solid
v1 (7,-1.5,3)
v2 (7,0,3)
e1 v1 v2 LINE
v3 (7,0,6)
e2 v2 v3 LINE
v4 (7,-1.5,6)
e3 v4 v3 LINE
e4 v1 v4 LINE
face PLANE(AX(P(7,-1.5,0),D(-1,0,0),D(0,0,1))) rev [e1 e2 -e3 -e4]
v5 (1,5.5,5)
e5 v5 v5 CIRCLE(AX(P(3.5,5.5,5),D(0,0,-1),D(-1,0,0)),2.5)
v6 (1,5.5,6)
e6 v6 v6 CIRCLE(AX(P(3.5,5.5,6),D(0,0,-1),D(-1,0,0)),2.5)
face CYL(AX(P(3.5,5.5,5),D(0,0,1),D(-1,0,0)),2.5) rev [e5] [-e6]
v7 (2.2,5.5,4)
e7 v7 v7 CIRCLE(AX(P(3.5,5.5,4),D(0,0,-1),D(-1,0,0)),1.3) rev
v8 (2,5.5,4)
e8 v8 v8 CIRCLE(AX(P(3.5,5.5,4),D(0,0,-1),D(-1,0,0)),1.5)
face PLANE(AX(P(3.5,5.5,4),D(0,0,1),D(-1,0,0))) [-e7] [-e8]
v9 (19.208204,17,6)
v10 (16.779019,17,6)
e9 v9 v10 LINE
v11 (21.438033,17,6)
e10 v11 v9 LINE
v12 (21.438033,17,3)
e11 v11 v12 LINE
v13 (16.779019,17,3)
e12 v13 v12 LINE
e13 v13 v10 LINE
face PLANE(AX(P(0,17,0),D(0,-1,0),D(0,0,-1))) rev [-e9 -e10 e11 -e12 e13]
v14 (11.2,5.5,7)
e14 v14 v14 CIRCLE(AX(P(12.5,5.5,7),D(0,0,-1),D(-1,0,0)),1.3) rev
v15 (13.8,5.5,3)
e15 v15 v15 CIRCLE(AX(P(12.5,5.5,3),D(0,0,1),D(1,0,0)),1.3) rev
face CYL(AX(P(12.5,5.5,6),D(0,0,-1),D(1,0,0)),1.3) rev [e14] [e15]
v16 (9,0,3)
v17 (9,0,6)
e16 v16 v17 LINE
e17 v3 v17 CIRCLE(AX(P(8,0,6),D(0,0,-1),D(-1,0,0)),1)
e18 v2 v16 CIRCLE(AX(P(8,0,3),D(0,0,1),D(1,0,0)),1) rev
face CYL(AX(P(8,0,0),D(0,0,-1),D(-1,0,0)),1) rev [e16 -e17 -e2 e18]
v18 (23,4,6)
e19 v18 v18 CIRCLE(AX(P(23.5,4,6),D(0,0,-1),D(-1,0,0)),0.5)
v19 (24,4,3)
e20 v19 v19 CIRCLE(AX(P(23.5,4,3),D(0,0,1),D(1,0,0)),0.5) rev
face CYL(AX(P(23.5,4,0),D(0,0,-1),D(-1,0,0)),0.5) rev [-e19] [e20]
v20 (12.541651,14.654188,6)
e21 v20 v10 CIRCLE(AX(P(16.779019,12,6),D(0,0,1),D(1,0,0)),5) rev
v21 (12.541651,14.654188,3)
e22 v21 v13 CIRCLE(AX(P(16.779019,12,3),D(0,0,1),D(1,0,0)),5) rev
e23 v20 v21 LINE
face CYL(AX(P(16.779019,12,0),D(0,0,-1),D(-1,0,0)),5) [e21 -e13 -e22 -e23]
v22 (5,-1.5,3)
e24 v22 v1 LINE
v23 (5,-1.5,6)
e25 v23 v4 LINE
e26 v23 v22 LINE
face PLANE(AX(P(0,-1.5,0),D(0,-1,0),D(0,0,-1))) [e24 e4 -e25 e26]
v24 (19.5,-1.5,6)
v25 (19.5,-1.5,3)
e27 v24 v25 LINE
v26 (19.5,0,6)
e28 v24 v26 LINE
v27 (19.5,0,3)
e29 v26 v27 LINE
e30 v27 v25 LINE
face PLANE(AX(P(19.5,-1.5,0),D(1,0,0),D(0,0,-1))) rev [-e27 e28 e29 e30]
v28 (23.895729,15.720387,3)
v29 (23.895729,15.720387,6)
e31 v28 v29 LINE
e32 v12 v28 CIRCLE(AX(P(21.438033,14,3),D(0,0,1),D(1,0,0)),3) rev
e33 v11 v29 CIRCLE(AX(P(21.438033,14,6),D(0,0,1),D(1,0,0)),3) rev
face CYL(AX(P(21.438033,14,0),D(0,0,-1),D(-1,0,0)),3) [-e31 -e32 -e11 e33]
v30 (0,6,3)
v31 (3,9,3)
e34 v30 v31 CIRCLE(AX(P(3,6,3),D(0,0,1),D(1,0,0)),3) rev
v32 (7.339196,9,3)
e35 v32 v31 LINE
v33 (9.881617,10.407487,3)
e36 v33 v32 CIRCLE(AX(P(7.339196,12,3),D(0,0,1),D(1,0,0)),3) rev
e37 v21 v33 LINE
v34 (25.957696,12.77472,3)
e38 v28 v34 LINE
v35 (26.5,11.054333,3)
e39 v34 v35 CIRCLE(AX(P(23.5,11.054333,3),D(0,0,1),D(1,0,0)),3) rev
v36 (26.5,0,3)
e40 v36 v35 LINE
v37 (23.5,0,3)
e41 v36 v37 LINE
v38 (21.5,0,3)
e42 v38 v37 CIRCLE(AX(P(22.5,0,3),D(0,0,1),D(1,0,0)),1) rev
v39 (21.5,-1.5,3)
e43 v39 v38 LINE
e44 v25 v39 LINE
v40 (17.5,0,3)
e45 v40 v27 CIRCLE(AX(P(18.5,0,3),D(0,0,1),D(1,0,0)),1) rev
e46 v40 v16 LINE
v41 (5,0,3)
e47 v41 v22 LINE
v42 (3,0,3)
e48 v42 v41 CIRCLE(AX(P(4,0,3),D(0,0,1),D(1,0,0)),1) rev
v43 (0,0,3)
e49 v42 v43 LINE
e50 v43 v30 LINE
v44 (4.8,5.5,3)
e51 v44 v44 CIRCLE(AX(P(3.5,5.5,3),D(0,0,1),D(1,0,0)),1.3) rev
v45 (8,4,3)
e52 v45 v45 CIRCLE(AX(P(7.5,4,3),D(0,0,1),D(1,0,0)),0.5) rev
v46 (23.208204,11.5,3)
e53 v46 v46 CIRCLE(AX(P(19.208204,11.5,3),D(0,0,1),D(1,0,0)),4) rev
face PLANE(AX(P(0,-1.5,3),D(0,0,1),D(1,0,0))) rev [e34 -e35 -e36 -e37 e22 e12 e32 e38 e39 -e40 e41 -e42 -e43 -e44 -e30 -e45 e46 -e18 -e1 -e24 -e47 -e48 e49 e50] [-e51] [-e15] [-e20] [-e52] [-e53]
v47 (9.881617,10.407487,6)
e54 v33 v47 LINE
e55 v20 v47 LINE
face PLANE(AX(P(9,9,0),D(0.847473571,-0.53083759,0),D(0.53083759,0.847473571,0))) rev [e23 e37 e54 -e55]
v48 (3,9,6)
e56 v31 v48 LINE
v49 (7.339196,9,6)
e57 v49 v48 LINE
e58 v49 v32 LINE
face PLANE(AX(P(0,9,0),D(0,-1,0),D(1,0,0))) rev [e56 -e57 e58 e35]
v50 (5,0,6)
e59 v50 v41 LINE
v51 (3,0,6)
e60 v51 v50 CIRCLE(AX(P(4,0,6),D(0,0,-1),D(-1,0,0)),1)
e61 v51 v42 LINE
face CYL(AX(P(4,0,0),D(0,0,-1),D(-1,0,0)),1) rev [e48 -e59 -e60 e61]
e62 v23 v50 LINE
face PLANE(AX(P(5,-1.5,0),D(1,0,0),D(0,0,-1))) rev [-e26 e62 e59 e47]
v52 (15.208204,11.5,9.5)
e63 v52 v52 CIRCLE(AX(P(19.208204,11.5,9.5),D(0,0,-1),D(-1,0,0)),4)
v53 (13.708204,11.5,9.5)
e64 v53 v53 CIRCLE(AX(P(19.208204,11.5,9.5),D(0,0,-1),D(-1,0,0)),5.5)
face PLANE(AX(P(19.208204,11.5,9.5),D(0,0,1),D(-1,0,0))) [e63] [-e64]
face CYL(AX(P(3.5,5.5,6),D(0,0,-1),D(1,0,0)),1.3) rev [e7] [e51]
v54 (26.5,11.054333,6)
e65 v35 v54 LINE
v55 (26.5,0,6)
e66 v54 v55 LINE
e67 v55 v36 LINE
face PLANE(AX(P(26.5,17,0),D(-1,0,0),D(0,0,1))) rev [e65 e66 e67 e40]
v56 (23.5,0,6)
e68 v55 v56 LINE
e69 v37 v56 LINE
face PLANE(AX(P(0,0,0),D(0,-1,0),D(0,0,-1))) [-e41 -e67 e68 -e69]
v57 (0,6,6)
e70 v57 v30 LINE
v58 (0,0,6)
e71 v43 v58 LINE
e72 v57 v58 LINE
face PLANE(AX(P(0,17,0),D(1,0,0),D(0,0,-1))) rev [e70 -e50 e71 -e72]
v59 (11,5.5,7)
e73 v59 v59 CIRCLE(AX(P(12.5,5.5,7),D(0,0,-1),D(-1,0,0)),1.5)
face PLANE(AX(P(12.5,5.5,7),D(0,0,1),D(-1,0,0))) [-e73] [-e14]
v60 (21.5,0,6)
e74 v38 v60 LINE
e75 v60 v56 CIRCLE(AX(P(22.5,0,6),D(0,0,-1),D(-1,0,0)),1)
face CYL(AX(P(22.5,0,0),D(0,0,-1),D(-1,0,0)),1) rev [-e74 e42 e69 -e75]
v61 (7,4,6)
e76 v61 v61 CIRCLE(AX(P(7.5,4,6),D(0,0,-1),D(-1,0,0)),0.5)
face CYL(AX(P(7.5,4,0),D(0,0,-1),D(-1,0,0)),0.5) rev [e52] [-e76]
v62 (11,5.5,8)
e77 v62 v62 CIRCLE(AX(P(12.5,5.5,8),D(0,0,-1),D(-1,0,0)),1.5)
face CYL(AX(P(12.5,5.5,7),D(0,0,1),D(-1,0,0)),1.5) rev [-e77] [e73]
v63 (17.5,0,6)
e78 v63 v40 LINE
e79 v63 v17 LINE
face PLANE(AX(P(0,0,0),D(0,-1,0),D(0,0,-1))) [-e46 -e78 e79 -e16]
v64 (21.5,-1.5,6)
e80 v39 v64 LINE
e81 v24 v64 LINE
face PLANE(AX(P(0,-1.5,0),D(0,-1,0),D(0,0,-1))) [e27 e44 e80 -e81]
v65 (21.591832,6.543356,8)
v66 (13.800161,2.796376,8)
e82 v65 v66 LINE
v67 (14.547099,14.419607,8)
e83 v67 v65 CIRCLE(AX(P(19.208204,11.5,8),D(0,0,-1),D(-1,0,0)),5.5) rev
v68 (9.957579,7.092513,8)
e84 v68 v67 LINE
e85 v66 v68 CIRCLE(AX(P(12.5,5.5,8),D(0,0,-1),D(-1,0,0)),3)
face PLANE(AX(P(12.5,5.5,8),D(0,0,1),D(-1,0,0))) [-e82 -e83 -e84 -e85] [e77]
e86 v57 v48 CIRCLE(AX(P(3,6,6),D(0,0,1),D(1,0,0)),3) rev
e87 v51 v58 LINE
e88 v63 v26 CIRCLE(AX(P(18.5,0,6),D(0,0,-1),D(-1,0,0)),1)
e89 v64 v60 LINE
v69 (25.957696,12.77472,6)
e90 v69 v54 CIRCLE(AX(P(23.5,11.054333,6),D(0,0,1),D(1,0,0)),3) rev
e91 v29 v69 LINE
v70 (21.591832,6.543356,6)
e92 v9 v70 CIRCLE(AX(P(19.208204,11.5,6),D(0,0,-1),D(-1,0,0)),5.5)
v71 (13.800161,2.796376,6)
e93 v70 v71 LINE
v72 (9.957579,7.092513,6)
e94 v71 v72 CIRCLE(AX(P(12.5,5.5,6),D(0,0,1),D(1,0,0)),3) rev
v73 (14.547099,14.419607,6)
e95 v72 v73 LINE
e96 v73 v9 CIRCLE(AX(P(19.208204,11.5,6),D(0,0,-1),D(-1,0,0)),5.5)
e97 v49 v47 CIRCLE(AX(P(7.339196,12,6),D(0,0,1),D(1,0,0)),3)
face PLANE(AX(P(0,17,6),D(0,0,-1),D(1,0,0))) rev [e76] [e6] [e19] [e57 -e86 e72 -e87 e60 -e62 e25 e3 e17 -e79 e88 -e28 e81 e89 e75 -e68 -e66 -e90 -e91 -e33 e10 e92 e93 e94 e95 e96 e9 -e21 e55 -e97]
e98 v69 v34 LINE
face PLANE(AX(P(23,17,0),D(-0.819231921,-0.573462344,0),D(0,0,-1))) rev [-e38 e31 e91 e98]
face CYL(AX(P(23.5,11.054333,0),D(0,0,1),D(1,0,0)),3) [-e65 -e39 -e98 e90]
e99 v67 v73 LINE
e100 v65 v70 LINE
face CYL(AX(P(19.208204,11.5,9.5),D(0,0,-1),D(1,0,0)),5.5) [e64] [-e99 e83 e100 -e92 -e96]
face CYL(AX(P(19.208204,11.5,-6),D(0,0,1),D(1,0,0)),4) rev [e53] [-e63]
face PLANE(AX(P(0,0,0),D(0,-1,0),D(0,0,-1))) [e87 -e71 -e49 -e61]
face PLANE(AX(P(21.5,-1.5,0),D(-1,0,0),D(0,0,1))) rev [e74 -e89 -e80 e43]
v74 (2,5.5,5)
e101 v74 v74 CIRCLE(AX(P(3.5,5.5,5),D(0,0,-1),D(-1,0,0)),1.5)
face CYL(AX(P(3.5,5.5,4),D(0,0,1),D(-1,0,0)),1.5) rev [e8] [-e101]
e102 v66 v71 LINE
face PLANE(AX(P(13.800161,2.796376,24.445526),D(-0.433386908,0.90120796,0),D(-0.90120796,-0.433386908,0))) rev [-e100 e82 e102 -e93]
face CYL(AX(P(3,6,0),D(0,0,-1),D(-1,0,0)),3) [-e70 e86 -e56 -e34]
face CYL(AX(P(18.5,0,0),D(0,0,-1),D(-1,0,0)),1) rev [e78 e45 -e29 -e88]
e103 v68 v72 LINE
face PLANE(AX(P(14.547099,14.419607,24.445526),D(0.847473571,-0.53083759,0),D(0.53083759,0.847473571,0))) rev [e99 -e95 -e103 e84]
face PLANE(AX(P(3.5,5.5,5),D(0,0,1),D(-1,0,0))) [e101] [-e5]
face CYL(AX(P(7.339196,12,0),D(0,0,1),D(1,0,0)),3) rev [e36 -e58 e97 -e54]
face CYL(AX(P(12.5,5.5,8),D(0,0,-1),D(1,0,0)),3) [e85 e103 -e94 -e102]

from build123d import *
from build123d.topology import SkipClean

# Parameters (mm, degrees)
SKETCH1_W                            = 26.5
SKETCH1_H                            = 6
BOSS_EXTRUDE1_DEPTH                  = 17
SKETCH2_R                            = 1.5
CUT_EXTRUDE1_DEPTH                   = 1
SKETCH3_R                            = 1.3
CUT_EXTRUDE2_DEPTH                   = 32.878676259
SKETCH4_R                            = 4
CUT_EXTRUDE3_DEPTH                   = 33.050741021
SKETCH5_R                            = 2.5
CUT_EXTRUDE4_DEPTH                   = 1.5
SKETCH6_R                            = 1.5
CUT_EXTRUDE8_DEPTH                   = 1
SKETCH7_R                            = 1.3
CUT_EXTRUDE9_DEPTH                   = 32.678068123
CUT_EXTRUDE10_START                  = -1
SKETCH8_R                            = 2.5
CUT_EXTRUDE10_DEPTH                  = 1
CUT_EXTRUDE11_START                  = -1
SKETCH9_R                            = 1.5
CUT_EXTRUDE11_DEPTH                  = 1
SKETCH10_R                           = 5.5
SKETCH10_R_2                         = 4
BOSS_EXTRUDE2_DEPTH                  = 3.5
SKETCH11_R                           = 3
SKETCH11_R_2                         = 1.3
BOSS_EXTRUDE4_DEPTH                  = 2
CUT_EXTRUDE12_START                  = -1
SKETCH12_R                           = 1.5
CUT_EXTRUDE12_DEPTH                  = 1
SKETCH17_W                           = 2
SKETCH17_H                           = 6
BOSS_EXTRUDE6_DEPTH                  = 1.5
SKETCH18_R                           = 1
CUT_EXTRUDE17_DEPTH                  = 33.050741021
CHAMFER2_SIZE                        = 5
CHAMFER2_SIZE2                       = 3.5
FILLET11_R                           = 3
BOSS_EXTRUDE7_DEPTH                  = 2
CUT_EXTRUDE19_DEPTH                  = 33.050741021
FILLET13_R                           = 5
FILLET14_R                           = 3
FILLET15_R                           = 3
SKIZZE1_R                            = 0.5
SCHNITT_LINEAR_AUSTRAGEN1_DEPTH      = 33.050741021
SPIEGELN1_OUTLINE_R                  = 4
SPIEGELN1_OUTLINE_R_2                = 2.5
SPIEGELN1_OUTLINE_R_3                = 0.5
SPIEGELN1_OUTLINE_R_4                = 1.5
SPIEGELN1_DEPTH                      = 6
SPIEGELN1_START                      = 6
SPIEGELN1_2_OUTLINE_R                = 4
SPIEGELN1_2_OUTLINE_R_2              = 1.5
SPIEGELN1_2_DEPTH                    = 2
SPIEGELN1_START_2                    = 8
SPIEGELN1_3_OUTLINE_R                = 5.5
SPIEGELN1_3_OUTLINE_R_2              = 4
SPIEGELN1_3_DEPTH                    = 1.5
SPIEGELN1_START_3                    = 1.5
SPIEGELN1_4_OUTLINE_R                = 1.5
SPIEGELN1_4_OUTLINE_R_2              = 1.3
SPIEGELN1_4_OUTLINE_R_3              = 2.5
SPIEGELN1_4_DEPTH                    = 3.5
SPIEGELN1_START_4                    = 1
SPIEGELN1_5_OUTLINE_R                = 1.5
SPIEGELN1_5_OUTLINE_R_2              = 1.3
SPIEGELN1_5_DEPTH                    = 6
SPIEGELN1_START_5                    = 2.5
SPIEGELN1_6_OUTLINE_R                = 1.5
SPIEGELN1_6_OUTLINE_R_2              = 1.3
SPIEGELN1_6_DEPTH                    = 1.5
SCHNITT_LINEAR_AUSTRAGEN2_DEPTH      = 31.409702399
SCHNITT_LINEAR_AUSTRAGEN2_DEPTH_BACK = 31.409702399
SKIZZE2_W                            = 26.5
SKIZZE2_H                            = 9.5
SCHNITT_LINEAR_AUSTRAGEN3_DEPTH      = 31.409702399
SCHNITT_LINEAR_AUSTRAGEN3_DEPTH_BACK = 31.409702399
SKIZZE3_W                            = 26.5
SKIZZE3_H                            = 3


# Read off the part's stored shape, not the designer's step: Spiegeln1
with BuildPart() as part:
    # Sketch1 → Boss-Extrude1 (new body)
    with BuildSketch(Plane(origin=(0, 0, 0), x_dir=(1, 0, 0), z_dir=(0, 1, 0))):
        with Locations((13.25, 3)):
            Rectangle(SKETCH1_W, SKETCH1_H)
    extrude(amount=BOSS_EXTRUDE1_DEPTH)

    # Sketch2 → Cut-Extrude1 (cut)
    with BuildSketch(Plane.XY):
        with Locations((12.5, 5.5)):
            Circle(SKETCH2_R)
    extrude(amount=-CUT_EXTRUDE1_DEPTH, mode=Mode.SUBTRACT)

    # Sketch3 → Cut-Extrude2 (cut, through all)
    with BuildSketch(Plane.XY.offset(-1)):
        with Locations((12.5, 5.5)):
            Circle(SKETCH3_R)
    extrude(amount=-CUT_EXTRUDE2_DEPTH, mode=Mode.SUBTRACT)

    # Sketch4 → Cut-Extrude3 (cut, through all)
    with BuildSketch(Plane.XY):
        with Locations((19.208203932, 11.5)):
            Circle(SKETCH4_R)
    extrude(amount=-CUT_EXTRUDE3_DEPTH, mode=Mode.SUBTRACT)

    # Sketch5 → Cut-Extrude4 (cut)
    with BuildSketch(Plane.XY):
        with Locations((3.5, 5.5)):
            Circle(SKETCH5_R)
    extrude(amount=-CUT_EXTRUDE4_DEPTH, mode=Mode.SUBTRACT)

    # Sketch6 → Cut-Extrude8 (cut)
    with BuildSketch(Plane.XY.offset(-1.5)):
        with Locations((3.5, 5.5)):
            Circle(SKETCH6_R)
    extrude(amount=-CUT_EXTRUDE8_DEPTH, mode=Mode.SUBTRACT)

    # Sketch7 → Cut-Extrude9 (cut, through all)
    with BuildSketch(Plane.XY.offset(-2.5)):
        with Locations((3.5, 5.5)):
            Circle(SKETCH7_R)
    extrude(amount=-CUT_EXTRUDE9_DEPTH, mode=Mode.SUBTRACT)

    # Sketch8 → Cut-Extrude10 (cut)
    with BuildSketch(Plane(origin=(0, 0, -6), x_dir=(-1, 0, 0), z_dir=(0, 0, -1)).offset(CUT_EXTRUDE10_START)):
        with Locations(Location((-3.5, 5.5, 0), (0, 0, 180))):
            Circle(SKETCH8_R)
    extrude(amount=CUT_EXTRUDE10_DEPTH, mode=Mode.SUBTRACT)

    # Sketch9 → Cut-Extrude11 (cut)
    with BuildSketch(Plane(origin=(0, 0, -5), x_dir=(-1, 0, 0), z_dir=(0, 0, -1)).offset(CUT_EXTRUDE11_START)):
        with Locations(Location((-3.5, 5.5, 0), (0, 0, 180))):
            Circle(SKETCH9_R)
    extrude(amount=CUT_EXTRUDE11_DEPTH, mode=Mode.SUBTRACT)

    # Sketch10 → Boss-Extrude2 (add)
    with BuildSketch(Plane(origin=(0, 0, -6), x_dir=(-1, 0, 0), z_dir=(0, 0, -1))):
        with Locations(Location((-19.208203932, 11.5, 0), (0, 0, 90))):
            Circle(SKETCH10_R)
        with Locations(Location((-19.208203932, 11.5, 0), (0, 0, 180))):
            Circle(SKETCH10_R_2, mode=Mode.SUBTRACT)
    extrude(amount=BOSS_EXTRUDE2_DEPTH)

    # Sketch11 → Boss-Extrude4 (add)
    with BuildSketch(Plane(origin=(0, 0, -6), x_dir=(-1, 0, 0), z_dir=(0, 0, -1))):
        with Locations(Location((-12.5, 5.5, 0), (0, 0, 180))):
            Circle(SKETCH11_R)
        with Locations(Location((-12.5, 5.5, 0), (0, 0, 180))):
            Circle(SKETCH11_R_2, mode=Mode.SUBTRACT)
    extrude(amount=BOSS_EXTRUDE4_DEPTH)

    # Sketch12 → Cut-Extrude12 (cut)
    with BuildSketch(Plane(origin=(0, 0, -8), x_dir=(-1, 0, 0), z_dir=(0, 0, -1)).offset(CUT_EXTRUDE12_START)):
        with Locations(Location((-12.5, 5.5, 0), (0, 0, 180))):
            Circle(SKETCH12_R)
    extrude(amount=CUT_EXTRUDE12_DEPTH, mode=Mode.SUBTRACT)

    # Sketch17 → Boss-Extrude6 (add)
    with BuildSketch(Plane.XZ):
        with Locations((6, -3)):
            Rectangle(SKETCH17_W, SKETCH17_H)
        with Locations((20.5, -3)):
            Rectangle(SKETCH17_W, SKETCH17_H)
    extrude(amount=BOSS_EXTRUDE6_DEPTH)

    # Sketch18 → Cut-Extrude17 (cut, through all)
    with BuildSketch(Plane(origin=(0, 0, -6), x_dir=(-1, 0, 0), z_dir=(0, 0, -1))):
        with Locations((-22.5, 0)):
            Circle(SKETCH18_R)
        with Locations((-18.5, 0)):
            Circle(SKETCH18_R)
        with Locations((-8, 0)):
            Circle(SKETCH18_R)
        with Locations((-4, 0)):
            Circle(SKETCH18_R)
    extrude(amount=-CUT_EXTRUDE17_DEPTH, mode=Mode.SUBTRACT)

    # Chamfer2
    chamfer2_edges = [part.edges().sort_by_distance(p)[0] for p in [
        (26.5, 17, -3),
    ]]
    chamfer2_side = [part.faces().sort_by_distance(p)[0] for p in [
        (26.5, 8.5, -3),
    ]]
    chamfer(chamfer2_edges, length=CHAMFER2_SIZE, length2=CHAMFER2_SIZE2, reference=chamfer2_side[0])

    # Fillet11
    fillet11_edges = [part.edges().sort_by_distance(p)[0] for p in [
        (23, 17, -3),
        (26.5, 12, -3),
    ]]
    fillet(fillet11_edges, radius=FILLET11_R)

    # Sketch19 → Boss-Extrude7 (add)
    with BuildSketch(Plane(origin=(0, 0, -6), x_dir=(-1, 0, 0), z_dir=(0, 0, -1))):
        with BuildLine():
            Line((-14.547099294, 14.419606745), (-9.957579288, 7.09251277))
            ThreePointArc((-9.957579288, 7.09251277), (-14.736067977, 7.5), (-13.800160725, 2.796376119))
            Line((-13.800160725, 2.796376119), (-21.591831928, 6.543356218))
            ThreePointArc((-21.591831928, 6.543356218), (-15.108745974, 7.833333333), (-14.547099294, 14.419606745))
        make_face()
    extrude(amount=BOSS_EXTRUDE7_DEPTH)

    # Sketch20 → Cut-Extrude19 (cut, through all)
    with BuildSketch(Plane(origin=(0, 0, -6), x_dir=(-1, 0, 0), z_dir=(0, 0, -1))):
        Polygon((0, 17), (-14.011012575, 17), (-9, 9), (0, 9), align=None)
    extrude(amount=-CUT_EXTRUDE19_DEPTH, mode=Mode.SUBTRACT)

    # Fillet13
    fillet13_edges = [part.edges().sort_by_distance(p)[0] for p in [
        (14.011012575, 17, -3),
    ]]
    fillet(fillet13_edges, radius=FILLET13_R)

    # Fillet14
    fillet14_edges = [part.edges().sort_by_distance(p)[0] for p in [
        (9, 9, -3),
    ]]
    fillet(fillet14_edges, radius=FILLET14_R)

    # Fillet15
    fillet15_edges = [part.edges().sort_by_distance(p)[0] for p in [
        (0, 9, -3),
    ]]
    fillet(fillet15_edges, radius=FILLET15_R)

    # Skizze1 → Schnitt-Linear austragen1 (cut, through all)
    with BuildSketch(Plane(origin=(0, 0, -6), x_dir=(-1, 0, 0), z_dir=(0, 0, -1))):
        with Locations((-23.5, 4)):
            Circle(SKIZZE1_R)
        with Locations((-7.5, 4)):
            Circle(SKIZZE1_R)
    extrude(amount=-SCHNITT_LINEAR_AUSTRAGEN1_DEPTH, mode=Mode.SUBTRACT)

    # Spiegeln1 outline → Spiegeln1 (add)
    with SkipClean():  # the faces are left unmerged after this step: merging them gives an invalid solid
        with BuildSketch(Plane.XY):
            with BuildLine():
                Line((21.438033315, 17), (16.779018718, 17))
                ThreePointArc((16.779018718, 17), (14.357339523, 16.374410803), (12.541650865, 14.65418795))
                Line((12.541650865, 14.65418795), (9.881617026, 10.40748723))
                ThreePointArc((9.881617026, 10.40748723), (8.792203831, 9.375353518), (7.339196314, 9))
                Line((7.339196314, 9), (3, 9))
                ThreePointArc((3, 9), (0.878679656, 8.121320344), (0, 6))
                Line((0, 6), (0, 0))
                Line((0, 0), (3, 0))
                ThreePointArc((3, 0), (4, 1), (5, 0))
                Line((5, 0), (5, -1.5))
                Line((5, -1.5), (7, -1.5))
                Line((7, -1.5), (7, 0))
                ThreePointArc((7, 0), (8, 1), (9, 0))
                Line((9, 0), (17.5, 0))
                ThreePointArc((17.5, 0), (18.5, 1), (19.5, 0))
                Line((19.5, 0), (19.5, -1.5))
                Line((19.5, -1.5), (21.5, -1.5))
                Line((21.5, -1.5), (21.5, 0))
                ThreePointArc((21.5, 0), (22.5, 1), (23.5, 0))
                Line((23.5, 0), (26.5, 0))
                Line((26.5, 0), (26.5, 11.054333308))
                ThreePointArc((26.5, 11.054333308), (26.361213666, 11.956251462), (25.957695762, 12.774720341))
                Line((25.957695762, 12.774720341), (23.895729077, 15.720387033))
                ThreePointArc((23.895729077, 15.720387033), (22.823464458, 16.660936029), (21.438033315, 17))
            make_face()
            with Locations((19.208203932, 11.5)):
                Circle(SPIEGELN1_OUTLINE_R, mode=Mode.SUBTRACT)
            with Locations((3.5, 5.5)):
                Circle(SPIEGELN1_OUTLINE_R_2, mode=Mode.SUBTRACT)
            with Locations((7.5, 4)):
                Circle(SPIEGELN1_OUTLINE_R_3, mode=Mode.SUBTRACT)
            with Locations((23.5, 4)):
                Circle(SPIEGELN1_OUTLINE_R_3, mode=Mode.SUBTRACT)
            with Locations((12.5, 5.5)):
                Circle(SPIEGELN1_OUTLINE_R_4, mode=Mode.SUBTRACT)
        extrude(amount=SPIEGELN1_DEPTH)

    # Spiegeln1 2 outline → Spiegeln1 2 (add)
    with SkipClean():  # the faces are left unmerged after this step: merging them gives an invalid solid
        with BuildSketch(Plane.XY.offset(SPIEGELN1_START)):
            with BuildLine():
                Line((14.547099293, 14.419606745), (9.957579288, 7.09251277))
                ThreePointArc((9.957579288, 7.09251277), (10.263932023, 3.5), (13.800160725, 2.796376119))
                Line((13.800160725, 2.796376119), (21.591831928, 6.543356218))
                ThreePointArc((21.591831928, 6.543356218), (23.307661891, 15.166666667), (14.547099293, 14.419606745))
            make_face()
            with Locations((19.208203932, 11.5)):
                Circle(SPIEGELN1_2_OUTLINE_R, mode=Mode.SUBTRACT)
            with Locations((12.5, 5.5)):
                Circle(SPIEGELN1_2_OUTLINE_R_2, mode=Mode.SUBTRACT)
        extrude(amount=SPIEGELN1_2_DEPTH)

    # Spiegeln1 3 outline → Spiegeln1 3 (add)
    with SkipClean():  # the faces are left unmerged after this step: merging them gives an invalid solid
        with BuildSketch(Plane.XY.offset(SPIEGELN1_START_2)):
            with Locations((19.208203932, 11.5)):
                Circle(SPIEGELN1_3_OUTLINE_R)
            with Locations((19.208203932, 11.5)):
                Circle(SPIEGELN1_3_OUTLINE_R_2, mode=Mode.SUBTRACT)
        extrude(amount=SPIEGELN1_3_DEPTH)

    # Spiegeln1 4 outline → Spiegeln1 4 (add)
    # profile 1 of 2: a face of its own
    with SkipClean():  # the faces are left unmerged after this step: merging them gives an invalid solid
        with BuildSketch(Plane.XY.offset(SPIEGELN1_START_3)):
            with Locations((12.5, 5.5)):
                Circle(SPIEGELN1_4_OUTLINE_R)
            with Locations((12.5, 5.5)):
                Circle(SPIEGELN1_4_OUTLINE_R_2, mode=Mode.SUBTRACT)
        # profile 2 of 2: a face of its own
        with BuildSketch(Plane.XY.offset(SPIEGELN1_START_3)):
            with Locations((3.5, 5.5)):
                Circle(SPIEGELN1_4_OUTLINE_R_3)
            with Locations((3.5, 5.5)):
                Circle(SPIEGELN1_4_OUTLINE_R, mode=Mode.SUBTRACT)
        extrude(amount=SPIEGELN1_4_DEPTH)

    # Spiegeln1 5 outline → Spiegeln1 5 (add)
    with SkipClean():  # the faces are left unmerged after this step: merging them gives an invalid solid
        with BuildSketch(Plane.XY.offset(SPIEGELN1_START_4)):
            with Locations((12.5, 5.5)):
                Circle(SPIEGELN1_5_OUTLINE_R)
            with Locations((12.5, 5.5)):
                Circle(SPIEGELN1_5_OUTLINE_R_2, mode=Mode.SUBTRACT)
        extrude(amount=SPIEGELN1_5_DEPTH)

    # Spiegeln1 6 outline → Spiegeln1 6 (add)
    with SkipClean():  # the faces are left unmerged after this step: merging them gives an invalid solid
        with BuildSketch(Plane.XY.offset(SPIEGELN1_START_5)):
            with Locations((3.5, 5.5)):
                Circle(SPIEGELN1_6_OUTLINE_R)
            with Locations((3.5, 5.5)):
                Circle(SPIEGELN1_6_OUTLINE_R_2, mode=Mode.SUBTRACT)
        extrude(amount=SPIEGELN1_6_DEPTH)

    # Skizze2 → Schnitt-Linear austragen2 (cut, two sides: drawn at the far end of the back side and taken through both)
    with BuildSketch(Plane(origin=(0, 5.5, 0), x_dir=(1, 0, 0), z_dir=(0, 1, 0)).offset(-SCHNITT_LINEAR_AUSTRAGEN2_DEPTH_BACK)):
        with Locations((13.25, 4.75)):
            Rectangle(SKIZZE2_W, SKIZZE2_H)
    extrude(amount=SCHNITT_LINEAR_AUSTRAGEN2_DEPTH + SCHNITT_LINEAR_AUSTRAGEN2_DEPTH_BACK, mode=Mode.SUBTRACT)

    # Skizze3 → Schnitt-Linear austragen3 (cut, two sides: drawn at the far end of the back side and taken through both)
    with BuildSketch(Plane(origin=(0, 5.5, 0), x_dir=(1, 0, 0), z_dir=(0, 1, 0)).offset(-SCHNITT_LINEAR_AUSTRAGEN3_DEPTH_BACK)):
        with Locations((13.25, -1.5)):
            Rectangle(SKIZZE3_W, SKIZZE3_H)
    extrude(amount=SCHNITT_LINEAR_AUSTRAGEN3_DEPTH + SCHNITT_LINEAR_AUSTRAGEN3_DEPTH_BACK, mode=Mode.SUBTRACT)


solid = part.part
